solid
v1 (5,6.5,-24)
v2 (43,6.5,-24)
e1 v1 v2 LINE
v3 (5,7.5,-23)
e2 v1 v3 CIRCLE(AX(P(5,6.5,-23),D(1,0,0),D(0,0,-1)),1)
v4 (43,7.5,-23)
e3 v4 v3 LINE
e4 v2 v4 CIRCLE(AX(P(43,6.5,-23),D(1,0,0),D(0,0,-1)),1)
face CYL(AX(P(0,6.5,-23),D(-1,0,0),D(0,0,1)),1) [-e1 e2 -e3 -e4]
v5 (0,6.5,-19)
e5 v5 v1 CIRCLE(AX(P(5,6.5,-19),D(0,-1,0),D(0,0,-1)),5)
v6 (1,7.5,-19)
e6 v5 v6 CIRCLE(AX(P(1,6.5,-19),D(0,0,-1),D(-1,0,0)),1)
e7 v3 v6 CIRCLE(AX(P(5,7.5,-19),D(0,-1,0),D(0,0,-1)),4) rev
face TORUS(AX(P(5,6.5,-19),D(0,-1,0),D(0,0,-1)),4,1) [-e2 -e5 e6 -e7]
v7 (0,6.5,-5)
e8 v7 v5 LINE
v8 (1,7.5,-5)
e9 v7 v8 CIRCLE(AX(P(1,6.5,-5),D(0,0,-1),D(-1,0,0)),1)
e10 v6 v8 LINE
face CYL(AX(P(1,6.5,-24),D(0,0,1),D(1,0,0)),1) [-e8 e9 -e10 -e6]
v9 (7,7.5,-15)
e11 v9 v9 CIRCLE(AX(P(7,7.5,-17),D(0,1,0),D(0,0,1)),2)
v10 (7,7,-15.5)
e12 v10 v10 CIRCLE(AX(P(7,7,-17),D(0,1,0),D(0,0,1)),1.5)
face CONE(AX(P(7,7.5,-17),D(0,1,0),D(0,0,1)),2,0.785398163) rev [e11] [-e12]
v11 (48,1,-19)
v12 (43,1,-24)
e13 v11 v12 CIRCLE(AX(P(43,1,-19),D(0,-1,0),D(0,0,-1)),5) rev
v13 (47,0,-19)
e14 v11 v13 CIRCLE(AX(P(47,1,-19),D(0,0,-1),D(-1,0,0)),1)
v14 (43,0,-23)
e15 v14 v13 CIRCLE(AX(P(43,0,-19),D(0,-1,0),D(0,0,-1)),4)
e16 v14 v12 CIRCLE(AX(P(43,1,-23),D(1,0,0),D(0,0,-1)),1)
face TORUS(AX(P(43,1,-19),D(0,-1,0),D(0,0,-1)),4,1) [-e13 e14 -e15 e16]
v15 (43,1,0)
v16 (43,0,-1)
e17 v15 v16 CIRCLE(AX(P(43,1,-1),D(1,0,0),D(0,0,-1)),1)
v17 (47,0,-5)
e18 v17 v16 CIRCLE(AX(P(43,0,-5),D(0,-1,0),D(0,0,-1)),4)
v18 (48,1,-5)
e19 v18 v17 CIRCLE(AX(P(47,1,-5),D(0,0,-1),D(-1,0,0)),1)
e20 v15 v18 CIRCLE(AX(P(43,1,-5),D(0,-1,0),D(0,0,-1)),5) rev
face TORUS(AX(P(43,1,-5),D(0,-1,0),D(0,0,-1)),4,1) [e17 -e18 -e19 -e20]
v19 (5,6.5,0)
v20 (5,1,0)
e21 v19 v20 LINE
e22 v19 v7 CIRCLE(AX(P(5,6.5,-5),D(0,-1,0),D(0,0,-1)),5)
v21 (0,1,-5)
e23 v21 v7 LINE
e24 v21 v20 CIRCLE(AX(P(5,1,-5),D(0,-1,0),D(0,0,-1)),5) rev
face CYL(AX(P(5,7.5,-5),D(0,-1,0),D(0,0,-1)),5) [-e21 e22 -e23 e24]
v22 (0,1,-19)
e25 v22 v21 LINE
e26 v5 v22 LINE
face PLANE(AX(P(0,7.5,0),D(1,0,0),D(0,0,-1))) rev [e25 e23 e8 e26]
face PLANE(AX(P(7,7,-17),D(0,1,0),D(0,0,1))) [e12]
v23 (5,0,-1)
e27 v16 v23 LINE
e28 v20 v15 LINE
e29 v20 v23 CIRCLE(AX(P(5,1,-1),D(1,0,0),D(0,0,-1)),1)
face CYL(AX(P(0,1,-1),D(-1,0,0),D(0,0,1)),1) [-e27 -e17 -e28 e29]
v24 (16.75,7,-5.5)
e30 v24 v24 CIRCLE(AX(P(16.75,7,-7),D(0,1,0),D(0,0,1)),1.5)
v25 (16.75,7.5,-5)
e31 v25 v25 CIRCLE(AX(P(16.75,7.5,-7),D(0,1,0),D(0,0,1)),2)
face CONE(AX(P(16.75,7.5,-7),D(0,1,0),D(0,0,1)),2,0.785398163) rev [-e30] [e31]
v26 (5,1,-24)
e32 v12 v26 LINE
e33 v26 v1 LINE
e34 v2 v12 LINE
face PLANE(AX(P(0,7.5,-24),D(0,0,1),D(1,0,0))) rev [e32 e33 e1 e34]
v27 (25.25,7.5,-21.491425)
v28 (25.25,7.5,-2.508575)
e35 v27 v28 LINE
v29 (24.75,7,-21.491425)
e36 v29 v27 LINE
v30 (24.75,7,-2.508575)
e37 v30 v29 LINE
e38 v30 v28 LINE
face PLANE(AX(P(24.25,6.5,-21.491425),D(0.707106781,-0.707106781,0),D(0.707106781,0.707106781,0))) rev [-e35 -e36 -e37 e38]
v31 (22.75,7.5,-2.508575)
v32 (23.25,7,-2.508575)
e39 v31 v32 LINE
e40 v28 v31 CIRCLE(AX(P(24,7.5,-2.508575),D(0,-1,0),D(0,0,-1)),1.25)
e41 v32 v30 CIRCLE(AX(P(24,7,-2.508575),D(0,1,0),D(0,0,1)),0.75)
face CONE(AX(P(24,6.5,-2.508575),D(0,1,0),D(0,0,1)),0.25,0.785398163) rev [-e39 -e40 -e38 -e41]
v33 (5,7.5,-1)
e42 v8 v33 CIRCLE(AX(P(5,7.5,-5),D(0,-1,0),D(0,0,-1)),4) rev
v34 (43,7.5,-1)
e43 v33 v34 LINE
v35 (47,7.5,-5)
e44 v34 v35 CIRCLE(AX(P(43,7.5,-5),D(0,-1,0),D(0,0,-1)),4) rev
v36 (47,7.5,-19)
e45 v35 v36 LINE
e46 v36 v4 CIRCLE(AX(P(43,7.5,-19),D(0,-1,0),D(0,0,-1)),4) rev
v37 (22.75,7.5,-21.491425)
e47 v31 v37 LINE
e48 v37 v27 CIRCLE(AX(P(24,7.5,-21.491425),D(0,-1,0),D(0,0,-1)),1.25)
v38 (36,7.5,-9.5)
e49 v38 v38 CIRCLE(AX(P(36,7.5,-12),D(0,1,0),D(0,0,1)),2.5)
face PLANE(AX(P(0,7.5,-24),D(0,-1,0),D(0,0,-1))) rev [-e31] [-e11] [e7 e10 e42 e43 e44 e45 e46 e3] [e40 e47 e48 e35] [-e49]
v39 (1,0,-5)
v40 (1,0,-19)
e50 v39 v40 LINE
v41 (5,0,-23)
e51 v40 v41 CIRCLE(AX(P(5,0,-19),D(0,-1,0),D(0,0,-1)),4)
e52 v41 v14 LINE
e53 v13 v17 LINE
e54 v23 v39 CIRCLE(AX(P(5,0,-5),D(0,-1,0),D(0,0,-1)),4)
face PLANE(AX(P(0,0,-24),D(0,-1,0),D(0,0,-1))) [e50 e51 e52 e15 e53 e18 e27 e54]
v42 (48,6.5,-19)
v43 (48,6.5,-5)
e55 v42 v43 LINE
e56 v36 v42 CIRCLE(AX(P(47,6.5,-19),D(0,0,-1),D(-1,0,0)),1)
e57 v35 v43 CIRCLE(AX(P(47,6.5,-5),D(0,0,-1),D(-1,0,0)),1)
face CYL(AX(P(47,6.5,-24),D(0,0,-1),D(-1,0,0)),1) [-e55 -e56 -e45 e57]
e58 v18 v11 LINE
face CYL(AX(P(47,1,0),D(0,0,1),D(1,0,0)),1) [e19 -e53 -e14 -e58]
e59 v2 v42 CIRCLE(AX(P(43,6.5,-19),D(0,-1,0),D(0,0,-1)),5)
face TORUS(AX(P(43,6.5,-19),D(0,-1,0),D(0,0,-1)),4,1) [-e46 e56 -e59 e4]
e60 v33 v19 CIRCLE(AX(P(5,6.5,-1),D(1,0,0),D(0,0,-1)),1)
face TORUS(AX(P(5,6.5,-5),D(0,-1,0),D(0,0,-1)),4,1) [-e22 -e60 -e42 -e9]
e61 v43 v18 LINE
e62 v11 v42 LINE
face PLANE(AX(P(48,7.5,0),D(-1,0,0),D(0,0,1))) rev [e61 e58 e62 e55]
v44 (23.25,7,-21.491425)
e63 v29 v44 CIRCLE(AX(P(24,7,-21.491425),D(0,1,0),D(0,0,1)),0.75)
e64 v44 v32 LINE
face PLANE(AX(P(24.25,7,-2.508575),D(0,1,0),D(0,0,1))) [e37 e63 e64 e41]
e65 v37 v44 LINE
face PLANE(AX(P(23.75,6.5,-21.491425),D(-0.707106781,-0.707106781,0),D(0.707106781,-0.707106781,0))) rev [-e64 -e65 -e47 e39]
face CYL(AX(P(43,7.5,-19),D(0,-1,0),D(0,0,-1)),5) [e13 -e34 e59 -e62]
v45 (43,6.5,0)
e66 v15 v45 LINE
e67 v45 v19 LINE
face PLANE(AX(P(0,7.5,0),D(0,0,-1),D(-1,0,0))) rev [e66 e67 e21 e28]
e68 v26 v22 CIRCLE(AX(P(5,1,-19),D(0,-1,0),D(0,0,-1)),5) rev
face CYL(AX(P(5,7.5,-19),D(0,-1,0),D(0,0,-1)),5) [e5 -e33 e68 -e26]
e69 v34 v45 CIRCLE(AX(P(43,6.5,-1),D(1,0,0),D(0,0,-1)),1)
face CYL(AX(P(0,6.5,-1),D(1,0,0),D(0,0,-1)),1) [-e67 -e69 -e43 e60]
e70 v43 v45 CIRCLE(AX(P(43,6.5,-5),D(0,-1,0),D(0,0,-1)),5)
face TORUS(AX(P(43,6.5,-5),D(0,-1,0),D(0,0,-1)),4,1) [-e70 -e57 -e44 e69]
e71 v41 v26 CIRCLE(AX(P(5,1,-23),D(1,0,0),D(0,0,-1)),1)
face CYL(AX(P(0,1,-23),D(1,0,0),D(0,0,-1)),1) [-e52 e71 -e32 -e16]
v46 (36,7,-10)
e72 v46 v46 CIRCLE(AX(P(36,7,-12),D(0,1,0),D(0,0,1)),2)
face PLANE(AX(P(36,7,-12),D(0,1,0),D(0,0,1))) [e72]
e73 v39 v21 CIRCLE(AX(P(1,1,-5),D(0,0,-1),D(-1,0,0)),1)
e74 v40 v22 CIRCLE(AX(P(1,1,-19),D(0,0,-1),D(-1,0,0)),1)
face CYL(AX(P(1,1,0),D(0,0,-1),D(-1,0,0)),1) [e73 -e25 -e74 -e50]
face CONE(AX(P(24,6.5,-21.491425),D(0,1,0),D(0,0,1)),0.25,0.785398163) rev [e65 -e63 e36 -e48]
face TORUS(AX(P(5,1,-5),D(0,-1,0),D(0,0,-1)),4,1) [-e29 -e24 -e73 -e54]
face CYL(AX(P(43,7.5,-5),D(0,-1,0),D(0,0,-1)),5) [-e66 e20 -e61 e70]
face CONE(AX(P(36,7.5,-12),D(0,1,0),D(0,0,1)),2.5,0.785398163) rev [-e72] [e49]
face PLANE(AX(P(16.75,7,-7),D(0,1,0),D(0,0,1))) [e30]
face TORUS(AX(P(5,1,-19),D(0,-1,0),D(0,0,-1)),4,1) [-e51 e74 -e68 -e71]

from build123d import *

# Parameters (mm, degrees)
ESQUISSE1_W                = 48
ESQUISSE1_H                = 24
EXTRUSION1_DEPTH           = 7.5
CONG_2_R                   = 5
CONG_5_R                   = 1
CONG_6_R                   = 1
ESQUISSE4_W                = 0.5
ESQUISSE4_H                = 18.982849842
EXTRUSION2_DEPTH           = 0.5
ESQUISSE5_R                = 0.25
EXTRUSION3_DEPTH           = 0.5
CHANFREIN1_SIZE            = 1
ESQUISSE10_R               = 2
EXTRUSION7_DEPTH           = 0.5
EXTRUSION7_DRAFT           = -45
EXTRUSION7_PROFILE_2_DEPTH = 0.5
EXTRUSION7_PROFILE_2_DRAFT = -45
ESQUISSE11_R               = 2.5
EXTRUSION8_DEPTH           = 0.5
EXTRUSION8_DRAFT           = -45


with BuildPart() as part:
    # Esquisse1 → Extrusion1 (new body)
    with BuildSketch(Plane(origin=(0, 0, 0), x_dir=(1, 0, 0), z_dir=(0, 1, 0))):
        with Locations((24, 12)):
            Rectangle(ESQUISSE1_W, ESQUISSE1_H)
    extrude(amount=EXTRUSION1_DEPTH)

    # Congé2
    cong_2_edges = [part.edges().sort_by_distance(p)[0] for p in [
        (0, 3.75, -24),
        (48, 3.75, -24),
        (48, 3.75, 0),
        (0, 3.75, 0),
    ]]
    fillet(cong_2_edges, radius=CONG_2_R)

    # Congé5
    cong_5_edges = [part.edges().sort_by_distance(p)[0] for p in [
        (48, 7.5, -12),
        (24, 7.5, 0),
        (0, 7.5, -12),
        (24, 7.5, -24),
        (1.464466094, 7.5, -22.535533906),
        (1.464466094, 7.5, -1.464466094),
        (46.535533906, 7.5, -22.535533906),
        (46.535533906, 7.5, -1.464466094),
    ]]
    fillet(cong_5_edges, radius=CONG_5_R)

    # Congé6
    cong_6_edges = [part.edges().sort_by_distance(p)[0] for p in [
        (48, 0, -12),
        (0, 0, -12),
        (24, 0, -24),
        (24, 0, 0),
        (1.464466094, 0, -22.535533906),
        (1.464466094, 0, -1.464466094),
        (46.535533906, 0, -22.535533906),
        (46.535533906, 0, -1.464466094),
    ]]
    fillet(cong_6_edges, radius=CONG_6_R)

    # Esquisse4 → Extrusion2 (cut)
    with BuildSketch(Plane(origin=(0, 7.5, 0), x_dir=(1, 0, 0), z_dir=(0, 1, 0))):
        with Locations((24, 12)):
            Rectangle(ESQUISSE4_W, ESQUISSE4_H)
    extrude(amount=-EXTRUSION2_DEPTH, mode=Mode.SUBTRACT)

    # Esquisse5 → Extrusion3 (cut)
    with BuildSketch(Plane(origin=(0, 7.5, 0), x_dir=(1, 0, 0), z_dir=(0, 1, 0))):
        with Locations((24, 21.491424921)):
            Circle(ESQUISSE5_R)
        with Locations((24, 2.508575079)):
            Circle(ESQUISSE5_R)
    extrude(amount=-EXTRUSION3_DEPTH, mode=Mode.SUBTRACT)

    # Chanfrein1
    # the kernel refuses this chamfer: 1 mm, written as the material it takes off along each edge
    with BuildSketch(Plane(origin=(24, 7.5, -21.491424921), x_dir=(1, 0, 0), z_dir=(0, 0, 1))) as chanfrein1_piece_1_section:
        Polygon((0.25 + CHANFREIN1_SIZE, 0), (0.25, -CHANFREIN1_SIZE), (0.25, 0), align=None)
    chanfrein1_piece_1 = revolve(axis=Axis((24, 7.5, -21.491424921), (0, 1, 0)), revolution_arc=180, mode=Mode.PRIVATE)
    chanfrein1_piece_1 = split(chanfrein1_piece_1, bisect_by=Plane(origin=(24, 7, -21.964580549), z_dir=(0, 1, 0)), keep=Keep.TOP, mode=Mode.PRIVATE)
    add(chanfrein1_piece_1, mode=Mode.SUBTRACT)
    with BuildSketch(Plane(origin=(24.25, 7.5, -21.491424921), x_dir=(0.9996219169112968, 0.02749587661058651, 0), z_dir=(0, 0, 1))) as chanfrein1_piece_2_section:
        Polygon((CHANFREIN1_SIZE * 0.999621916911, -CHANFREIN1_SIZE * 0.0274958766106), (-CHANFREIN1_SIZE * 0.0274958766106, -CHANFREIN1_SIZE * 0.999621916911), (0, 0), align=None)
    chanfrein1_piece_2 = extrude(amount=18.982849842, mode=Mode.PRIVATE)
    chanfrein1_piece_2 = split(chanfrein1_piece_2, bisect_by=Plane(origin=(24.643401084, 7, -12), z_dir=(0, 1, 0)), keep=Keep.TOP, mode=Mode.PRIVATE)
    add(chanfrein1_piece_2, mode=Mode.SUBTRACT)
    with BuildSketch(Plane(origin=(24, 7.5, -2.508575079), x_dir=(-1, 0, 0), z_dir=(0, 0, -1))) as chanfrein1_piece_3_section:
        Polygon((0.25 + CHANFREIN1_SIZE, 0), (0.25, -CHANFREIN1_SIZE), (0.25, 0), align=None)
    chanfrein1_piece_3 = revolve(axis=Axis((24, 7.5, -2.508575079), (0, 1, 0)), revolution_arc=180, mode=Mode.PRIVATE)
    chanfrein1_piece_3 = split(chanfrein1_piece_3, bisect_by=Plane(origin=(24, 7, -2.035419451), z_dir=(0, 1, 0)), keep=Keep.TOP, mode=Mode.PRIVATE)
    add(chanfrein1_piece_3, mode=Mode.SUBTRACT)
    with BuildSketch(Plane(origin=(23.75, 7.5, -2.508575079), x_dir=(-0.9996219169112968, 0.02749587661058651, 0), z_dir=(0, 0, -1))) as chanfrein1_piece_4_section:
        Polygon((CHANFREIN1_SIZE * 0.999621916911, -CHANFREIN1_SIZE * 0.0274958766106), (-CHANFREIN1_SIZE * 0.0274958766106, -CHANFREIN1_SIZE * 0.999621916911), (0, 0), align=None)
    chanfrein1_piece_4 = extrude(amount=18.982849842, mode=Mode.PRIVATE)
    chanfrein1_piece_4 = split(chanfrein1_piece_4, bisect_by=Plane(origin=(23.356598916, 7, -12), z_dir=(0, 1, 0)), keep=Keep.TOP, mode=Mode.PRIVATE)
    add(chanfrein1_piece_4, mode=Mode.SUBTRACT)


with BuildPart() as extrusion7_tool:
    # Esquisse10 → Extrusion7 (with draft: the straight prism first)
    with BuildSketch(Plane(origin=(0, 7.5, 0), x_dir=(1, 0, 0), z_dir=(0, 1, 0))):
        with Locations((7, 17)):
            Circle(ESQUISSE10_R)
    extrude(amount=-EXTRUSION7_DEPTH)
    # Extrusion7: the draft: its side faces are tilted about the plane it starts from
    extrusion7_sides = [extrusion7_tool.faces().sort_by_distance(p)[0] for p in [
        (5, 7.25, -17),
    ]]
    draft(extrusion7_sides, Plane(origin=(0, 7.5, 0), x_dir=(1, 0, 0), z_dir=(0, 1, 0)), EXTRUSION7_DRAFT)


with BuildPart() as part_1:
    add(part.part)

    # Extrusion7: cut by extrusion7_tool
    add(extrusion7_tool.part, mode=Mode.SUBTRACT)


with BuildPart() as extrusion7_profile_2_tool:
    # Esquisse10 → Extrusion7 profile 2 (with draft: the straight prism first)
    with BuildSketch(Plane(origin=(0, 7.5, 0), x_dir=(1, 0, 0), z_dir=(0, 1, 0))):
        with Locations((16.75, 7)):
            Circle(ESQUISSE10_R)
    extrude(amount=-EXTRUSION7_PROFILE_2_DEPTH)
    # Extrusion7 profile 2: the draft: its side faces are tilted about the plane it starts from
    extrusion7_profile_2_sides = [extrusion7_profile_2_tool.faces().sort_by_distance(p)[0] for p in [
        (14.75, 7.25, -7),
    ]]
    draft(extrusion7_profile_2_sides, Plane(origin=(0, 7.5, 0), x_dir=(1, 0, 0), z_dir=(0, 1, 0)), EXTRUSION7_PROFILE_2_DRAFT)


with BuildPart() as part_2:
    add(part_1.part)

    # Extrusion7 profile 2: cut by extrusion7_profile_2_tool
    add(extrusion7_profile_2_tool.part, mode=Mode.SUBTRACT)


with BuildPart() as extrusion8_tool:
    # Esquisse11 → Extrusion8 (with draft: the straight prism first)
    with BuildSketch(Plane(origin=(0, 7.5, 0), x_dir=(1, 0, 0), z_dir=(0, 1, 0))):
        with Locations((36, 12)):
            Circle(ESQUISSE11_R)
    extrude(amount=-EXTRUSION8_DEPTH)
    # Extrusion8: the draft: its side faces are tilted about the plane it starts from
    extrusion8_sides = [extrusion8_tool.faces().sort_by_distance(p)[0] for p in [
        (33.5, 7.25, -12),
    ]]
    draft(extrusion8_sides, Plane(origin=(0, 7.5, 0), x_dir=(1, 0, 0), z_dir=(0, 1, 0)), EXTRUSION8_DRAFT)


with BuildPart() as part_3:
    add(part_2.part)

    # Extrusion8: cut by extrusion8_tool
    add(extrusion8_tool.part, mode=Mode.SUBTRACT)


solid = part_3.part
